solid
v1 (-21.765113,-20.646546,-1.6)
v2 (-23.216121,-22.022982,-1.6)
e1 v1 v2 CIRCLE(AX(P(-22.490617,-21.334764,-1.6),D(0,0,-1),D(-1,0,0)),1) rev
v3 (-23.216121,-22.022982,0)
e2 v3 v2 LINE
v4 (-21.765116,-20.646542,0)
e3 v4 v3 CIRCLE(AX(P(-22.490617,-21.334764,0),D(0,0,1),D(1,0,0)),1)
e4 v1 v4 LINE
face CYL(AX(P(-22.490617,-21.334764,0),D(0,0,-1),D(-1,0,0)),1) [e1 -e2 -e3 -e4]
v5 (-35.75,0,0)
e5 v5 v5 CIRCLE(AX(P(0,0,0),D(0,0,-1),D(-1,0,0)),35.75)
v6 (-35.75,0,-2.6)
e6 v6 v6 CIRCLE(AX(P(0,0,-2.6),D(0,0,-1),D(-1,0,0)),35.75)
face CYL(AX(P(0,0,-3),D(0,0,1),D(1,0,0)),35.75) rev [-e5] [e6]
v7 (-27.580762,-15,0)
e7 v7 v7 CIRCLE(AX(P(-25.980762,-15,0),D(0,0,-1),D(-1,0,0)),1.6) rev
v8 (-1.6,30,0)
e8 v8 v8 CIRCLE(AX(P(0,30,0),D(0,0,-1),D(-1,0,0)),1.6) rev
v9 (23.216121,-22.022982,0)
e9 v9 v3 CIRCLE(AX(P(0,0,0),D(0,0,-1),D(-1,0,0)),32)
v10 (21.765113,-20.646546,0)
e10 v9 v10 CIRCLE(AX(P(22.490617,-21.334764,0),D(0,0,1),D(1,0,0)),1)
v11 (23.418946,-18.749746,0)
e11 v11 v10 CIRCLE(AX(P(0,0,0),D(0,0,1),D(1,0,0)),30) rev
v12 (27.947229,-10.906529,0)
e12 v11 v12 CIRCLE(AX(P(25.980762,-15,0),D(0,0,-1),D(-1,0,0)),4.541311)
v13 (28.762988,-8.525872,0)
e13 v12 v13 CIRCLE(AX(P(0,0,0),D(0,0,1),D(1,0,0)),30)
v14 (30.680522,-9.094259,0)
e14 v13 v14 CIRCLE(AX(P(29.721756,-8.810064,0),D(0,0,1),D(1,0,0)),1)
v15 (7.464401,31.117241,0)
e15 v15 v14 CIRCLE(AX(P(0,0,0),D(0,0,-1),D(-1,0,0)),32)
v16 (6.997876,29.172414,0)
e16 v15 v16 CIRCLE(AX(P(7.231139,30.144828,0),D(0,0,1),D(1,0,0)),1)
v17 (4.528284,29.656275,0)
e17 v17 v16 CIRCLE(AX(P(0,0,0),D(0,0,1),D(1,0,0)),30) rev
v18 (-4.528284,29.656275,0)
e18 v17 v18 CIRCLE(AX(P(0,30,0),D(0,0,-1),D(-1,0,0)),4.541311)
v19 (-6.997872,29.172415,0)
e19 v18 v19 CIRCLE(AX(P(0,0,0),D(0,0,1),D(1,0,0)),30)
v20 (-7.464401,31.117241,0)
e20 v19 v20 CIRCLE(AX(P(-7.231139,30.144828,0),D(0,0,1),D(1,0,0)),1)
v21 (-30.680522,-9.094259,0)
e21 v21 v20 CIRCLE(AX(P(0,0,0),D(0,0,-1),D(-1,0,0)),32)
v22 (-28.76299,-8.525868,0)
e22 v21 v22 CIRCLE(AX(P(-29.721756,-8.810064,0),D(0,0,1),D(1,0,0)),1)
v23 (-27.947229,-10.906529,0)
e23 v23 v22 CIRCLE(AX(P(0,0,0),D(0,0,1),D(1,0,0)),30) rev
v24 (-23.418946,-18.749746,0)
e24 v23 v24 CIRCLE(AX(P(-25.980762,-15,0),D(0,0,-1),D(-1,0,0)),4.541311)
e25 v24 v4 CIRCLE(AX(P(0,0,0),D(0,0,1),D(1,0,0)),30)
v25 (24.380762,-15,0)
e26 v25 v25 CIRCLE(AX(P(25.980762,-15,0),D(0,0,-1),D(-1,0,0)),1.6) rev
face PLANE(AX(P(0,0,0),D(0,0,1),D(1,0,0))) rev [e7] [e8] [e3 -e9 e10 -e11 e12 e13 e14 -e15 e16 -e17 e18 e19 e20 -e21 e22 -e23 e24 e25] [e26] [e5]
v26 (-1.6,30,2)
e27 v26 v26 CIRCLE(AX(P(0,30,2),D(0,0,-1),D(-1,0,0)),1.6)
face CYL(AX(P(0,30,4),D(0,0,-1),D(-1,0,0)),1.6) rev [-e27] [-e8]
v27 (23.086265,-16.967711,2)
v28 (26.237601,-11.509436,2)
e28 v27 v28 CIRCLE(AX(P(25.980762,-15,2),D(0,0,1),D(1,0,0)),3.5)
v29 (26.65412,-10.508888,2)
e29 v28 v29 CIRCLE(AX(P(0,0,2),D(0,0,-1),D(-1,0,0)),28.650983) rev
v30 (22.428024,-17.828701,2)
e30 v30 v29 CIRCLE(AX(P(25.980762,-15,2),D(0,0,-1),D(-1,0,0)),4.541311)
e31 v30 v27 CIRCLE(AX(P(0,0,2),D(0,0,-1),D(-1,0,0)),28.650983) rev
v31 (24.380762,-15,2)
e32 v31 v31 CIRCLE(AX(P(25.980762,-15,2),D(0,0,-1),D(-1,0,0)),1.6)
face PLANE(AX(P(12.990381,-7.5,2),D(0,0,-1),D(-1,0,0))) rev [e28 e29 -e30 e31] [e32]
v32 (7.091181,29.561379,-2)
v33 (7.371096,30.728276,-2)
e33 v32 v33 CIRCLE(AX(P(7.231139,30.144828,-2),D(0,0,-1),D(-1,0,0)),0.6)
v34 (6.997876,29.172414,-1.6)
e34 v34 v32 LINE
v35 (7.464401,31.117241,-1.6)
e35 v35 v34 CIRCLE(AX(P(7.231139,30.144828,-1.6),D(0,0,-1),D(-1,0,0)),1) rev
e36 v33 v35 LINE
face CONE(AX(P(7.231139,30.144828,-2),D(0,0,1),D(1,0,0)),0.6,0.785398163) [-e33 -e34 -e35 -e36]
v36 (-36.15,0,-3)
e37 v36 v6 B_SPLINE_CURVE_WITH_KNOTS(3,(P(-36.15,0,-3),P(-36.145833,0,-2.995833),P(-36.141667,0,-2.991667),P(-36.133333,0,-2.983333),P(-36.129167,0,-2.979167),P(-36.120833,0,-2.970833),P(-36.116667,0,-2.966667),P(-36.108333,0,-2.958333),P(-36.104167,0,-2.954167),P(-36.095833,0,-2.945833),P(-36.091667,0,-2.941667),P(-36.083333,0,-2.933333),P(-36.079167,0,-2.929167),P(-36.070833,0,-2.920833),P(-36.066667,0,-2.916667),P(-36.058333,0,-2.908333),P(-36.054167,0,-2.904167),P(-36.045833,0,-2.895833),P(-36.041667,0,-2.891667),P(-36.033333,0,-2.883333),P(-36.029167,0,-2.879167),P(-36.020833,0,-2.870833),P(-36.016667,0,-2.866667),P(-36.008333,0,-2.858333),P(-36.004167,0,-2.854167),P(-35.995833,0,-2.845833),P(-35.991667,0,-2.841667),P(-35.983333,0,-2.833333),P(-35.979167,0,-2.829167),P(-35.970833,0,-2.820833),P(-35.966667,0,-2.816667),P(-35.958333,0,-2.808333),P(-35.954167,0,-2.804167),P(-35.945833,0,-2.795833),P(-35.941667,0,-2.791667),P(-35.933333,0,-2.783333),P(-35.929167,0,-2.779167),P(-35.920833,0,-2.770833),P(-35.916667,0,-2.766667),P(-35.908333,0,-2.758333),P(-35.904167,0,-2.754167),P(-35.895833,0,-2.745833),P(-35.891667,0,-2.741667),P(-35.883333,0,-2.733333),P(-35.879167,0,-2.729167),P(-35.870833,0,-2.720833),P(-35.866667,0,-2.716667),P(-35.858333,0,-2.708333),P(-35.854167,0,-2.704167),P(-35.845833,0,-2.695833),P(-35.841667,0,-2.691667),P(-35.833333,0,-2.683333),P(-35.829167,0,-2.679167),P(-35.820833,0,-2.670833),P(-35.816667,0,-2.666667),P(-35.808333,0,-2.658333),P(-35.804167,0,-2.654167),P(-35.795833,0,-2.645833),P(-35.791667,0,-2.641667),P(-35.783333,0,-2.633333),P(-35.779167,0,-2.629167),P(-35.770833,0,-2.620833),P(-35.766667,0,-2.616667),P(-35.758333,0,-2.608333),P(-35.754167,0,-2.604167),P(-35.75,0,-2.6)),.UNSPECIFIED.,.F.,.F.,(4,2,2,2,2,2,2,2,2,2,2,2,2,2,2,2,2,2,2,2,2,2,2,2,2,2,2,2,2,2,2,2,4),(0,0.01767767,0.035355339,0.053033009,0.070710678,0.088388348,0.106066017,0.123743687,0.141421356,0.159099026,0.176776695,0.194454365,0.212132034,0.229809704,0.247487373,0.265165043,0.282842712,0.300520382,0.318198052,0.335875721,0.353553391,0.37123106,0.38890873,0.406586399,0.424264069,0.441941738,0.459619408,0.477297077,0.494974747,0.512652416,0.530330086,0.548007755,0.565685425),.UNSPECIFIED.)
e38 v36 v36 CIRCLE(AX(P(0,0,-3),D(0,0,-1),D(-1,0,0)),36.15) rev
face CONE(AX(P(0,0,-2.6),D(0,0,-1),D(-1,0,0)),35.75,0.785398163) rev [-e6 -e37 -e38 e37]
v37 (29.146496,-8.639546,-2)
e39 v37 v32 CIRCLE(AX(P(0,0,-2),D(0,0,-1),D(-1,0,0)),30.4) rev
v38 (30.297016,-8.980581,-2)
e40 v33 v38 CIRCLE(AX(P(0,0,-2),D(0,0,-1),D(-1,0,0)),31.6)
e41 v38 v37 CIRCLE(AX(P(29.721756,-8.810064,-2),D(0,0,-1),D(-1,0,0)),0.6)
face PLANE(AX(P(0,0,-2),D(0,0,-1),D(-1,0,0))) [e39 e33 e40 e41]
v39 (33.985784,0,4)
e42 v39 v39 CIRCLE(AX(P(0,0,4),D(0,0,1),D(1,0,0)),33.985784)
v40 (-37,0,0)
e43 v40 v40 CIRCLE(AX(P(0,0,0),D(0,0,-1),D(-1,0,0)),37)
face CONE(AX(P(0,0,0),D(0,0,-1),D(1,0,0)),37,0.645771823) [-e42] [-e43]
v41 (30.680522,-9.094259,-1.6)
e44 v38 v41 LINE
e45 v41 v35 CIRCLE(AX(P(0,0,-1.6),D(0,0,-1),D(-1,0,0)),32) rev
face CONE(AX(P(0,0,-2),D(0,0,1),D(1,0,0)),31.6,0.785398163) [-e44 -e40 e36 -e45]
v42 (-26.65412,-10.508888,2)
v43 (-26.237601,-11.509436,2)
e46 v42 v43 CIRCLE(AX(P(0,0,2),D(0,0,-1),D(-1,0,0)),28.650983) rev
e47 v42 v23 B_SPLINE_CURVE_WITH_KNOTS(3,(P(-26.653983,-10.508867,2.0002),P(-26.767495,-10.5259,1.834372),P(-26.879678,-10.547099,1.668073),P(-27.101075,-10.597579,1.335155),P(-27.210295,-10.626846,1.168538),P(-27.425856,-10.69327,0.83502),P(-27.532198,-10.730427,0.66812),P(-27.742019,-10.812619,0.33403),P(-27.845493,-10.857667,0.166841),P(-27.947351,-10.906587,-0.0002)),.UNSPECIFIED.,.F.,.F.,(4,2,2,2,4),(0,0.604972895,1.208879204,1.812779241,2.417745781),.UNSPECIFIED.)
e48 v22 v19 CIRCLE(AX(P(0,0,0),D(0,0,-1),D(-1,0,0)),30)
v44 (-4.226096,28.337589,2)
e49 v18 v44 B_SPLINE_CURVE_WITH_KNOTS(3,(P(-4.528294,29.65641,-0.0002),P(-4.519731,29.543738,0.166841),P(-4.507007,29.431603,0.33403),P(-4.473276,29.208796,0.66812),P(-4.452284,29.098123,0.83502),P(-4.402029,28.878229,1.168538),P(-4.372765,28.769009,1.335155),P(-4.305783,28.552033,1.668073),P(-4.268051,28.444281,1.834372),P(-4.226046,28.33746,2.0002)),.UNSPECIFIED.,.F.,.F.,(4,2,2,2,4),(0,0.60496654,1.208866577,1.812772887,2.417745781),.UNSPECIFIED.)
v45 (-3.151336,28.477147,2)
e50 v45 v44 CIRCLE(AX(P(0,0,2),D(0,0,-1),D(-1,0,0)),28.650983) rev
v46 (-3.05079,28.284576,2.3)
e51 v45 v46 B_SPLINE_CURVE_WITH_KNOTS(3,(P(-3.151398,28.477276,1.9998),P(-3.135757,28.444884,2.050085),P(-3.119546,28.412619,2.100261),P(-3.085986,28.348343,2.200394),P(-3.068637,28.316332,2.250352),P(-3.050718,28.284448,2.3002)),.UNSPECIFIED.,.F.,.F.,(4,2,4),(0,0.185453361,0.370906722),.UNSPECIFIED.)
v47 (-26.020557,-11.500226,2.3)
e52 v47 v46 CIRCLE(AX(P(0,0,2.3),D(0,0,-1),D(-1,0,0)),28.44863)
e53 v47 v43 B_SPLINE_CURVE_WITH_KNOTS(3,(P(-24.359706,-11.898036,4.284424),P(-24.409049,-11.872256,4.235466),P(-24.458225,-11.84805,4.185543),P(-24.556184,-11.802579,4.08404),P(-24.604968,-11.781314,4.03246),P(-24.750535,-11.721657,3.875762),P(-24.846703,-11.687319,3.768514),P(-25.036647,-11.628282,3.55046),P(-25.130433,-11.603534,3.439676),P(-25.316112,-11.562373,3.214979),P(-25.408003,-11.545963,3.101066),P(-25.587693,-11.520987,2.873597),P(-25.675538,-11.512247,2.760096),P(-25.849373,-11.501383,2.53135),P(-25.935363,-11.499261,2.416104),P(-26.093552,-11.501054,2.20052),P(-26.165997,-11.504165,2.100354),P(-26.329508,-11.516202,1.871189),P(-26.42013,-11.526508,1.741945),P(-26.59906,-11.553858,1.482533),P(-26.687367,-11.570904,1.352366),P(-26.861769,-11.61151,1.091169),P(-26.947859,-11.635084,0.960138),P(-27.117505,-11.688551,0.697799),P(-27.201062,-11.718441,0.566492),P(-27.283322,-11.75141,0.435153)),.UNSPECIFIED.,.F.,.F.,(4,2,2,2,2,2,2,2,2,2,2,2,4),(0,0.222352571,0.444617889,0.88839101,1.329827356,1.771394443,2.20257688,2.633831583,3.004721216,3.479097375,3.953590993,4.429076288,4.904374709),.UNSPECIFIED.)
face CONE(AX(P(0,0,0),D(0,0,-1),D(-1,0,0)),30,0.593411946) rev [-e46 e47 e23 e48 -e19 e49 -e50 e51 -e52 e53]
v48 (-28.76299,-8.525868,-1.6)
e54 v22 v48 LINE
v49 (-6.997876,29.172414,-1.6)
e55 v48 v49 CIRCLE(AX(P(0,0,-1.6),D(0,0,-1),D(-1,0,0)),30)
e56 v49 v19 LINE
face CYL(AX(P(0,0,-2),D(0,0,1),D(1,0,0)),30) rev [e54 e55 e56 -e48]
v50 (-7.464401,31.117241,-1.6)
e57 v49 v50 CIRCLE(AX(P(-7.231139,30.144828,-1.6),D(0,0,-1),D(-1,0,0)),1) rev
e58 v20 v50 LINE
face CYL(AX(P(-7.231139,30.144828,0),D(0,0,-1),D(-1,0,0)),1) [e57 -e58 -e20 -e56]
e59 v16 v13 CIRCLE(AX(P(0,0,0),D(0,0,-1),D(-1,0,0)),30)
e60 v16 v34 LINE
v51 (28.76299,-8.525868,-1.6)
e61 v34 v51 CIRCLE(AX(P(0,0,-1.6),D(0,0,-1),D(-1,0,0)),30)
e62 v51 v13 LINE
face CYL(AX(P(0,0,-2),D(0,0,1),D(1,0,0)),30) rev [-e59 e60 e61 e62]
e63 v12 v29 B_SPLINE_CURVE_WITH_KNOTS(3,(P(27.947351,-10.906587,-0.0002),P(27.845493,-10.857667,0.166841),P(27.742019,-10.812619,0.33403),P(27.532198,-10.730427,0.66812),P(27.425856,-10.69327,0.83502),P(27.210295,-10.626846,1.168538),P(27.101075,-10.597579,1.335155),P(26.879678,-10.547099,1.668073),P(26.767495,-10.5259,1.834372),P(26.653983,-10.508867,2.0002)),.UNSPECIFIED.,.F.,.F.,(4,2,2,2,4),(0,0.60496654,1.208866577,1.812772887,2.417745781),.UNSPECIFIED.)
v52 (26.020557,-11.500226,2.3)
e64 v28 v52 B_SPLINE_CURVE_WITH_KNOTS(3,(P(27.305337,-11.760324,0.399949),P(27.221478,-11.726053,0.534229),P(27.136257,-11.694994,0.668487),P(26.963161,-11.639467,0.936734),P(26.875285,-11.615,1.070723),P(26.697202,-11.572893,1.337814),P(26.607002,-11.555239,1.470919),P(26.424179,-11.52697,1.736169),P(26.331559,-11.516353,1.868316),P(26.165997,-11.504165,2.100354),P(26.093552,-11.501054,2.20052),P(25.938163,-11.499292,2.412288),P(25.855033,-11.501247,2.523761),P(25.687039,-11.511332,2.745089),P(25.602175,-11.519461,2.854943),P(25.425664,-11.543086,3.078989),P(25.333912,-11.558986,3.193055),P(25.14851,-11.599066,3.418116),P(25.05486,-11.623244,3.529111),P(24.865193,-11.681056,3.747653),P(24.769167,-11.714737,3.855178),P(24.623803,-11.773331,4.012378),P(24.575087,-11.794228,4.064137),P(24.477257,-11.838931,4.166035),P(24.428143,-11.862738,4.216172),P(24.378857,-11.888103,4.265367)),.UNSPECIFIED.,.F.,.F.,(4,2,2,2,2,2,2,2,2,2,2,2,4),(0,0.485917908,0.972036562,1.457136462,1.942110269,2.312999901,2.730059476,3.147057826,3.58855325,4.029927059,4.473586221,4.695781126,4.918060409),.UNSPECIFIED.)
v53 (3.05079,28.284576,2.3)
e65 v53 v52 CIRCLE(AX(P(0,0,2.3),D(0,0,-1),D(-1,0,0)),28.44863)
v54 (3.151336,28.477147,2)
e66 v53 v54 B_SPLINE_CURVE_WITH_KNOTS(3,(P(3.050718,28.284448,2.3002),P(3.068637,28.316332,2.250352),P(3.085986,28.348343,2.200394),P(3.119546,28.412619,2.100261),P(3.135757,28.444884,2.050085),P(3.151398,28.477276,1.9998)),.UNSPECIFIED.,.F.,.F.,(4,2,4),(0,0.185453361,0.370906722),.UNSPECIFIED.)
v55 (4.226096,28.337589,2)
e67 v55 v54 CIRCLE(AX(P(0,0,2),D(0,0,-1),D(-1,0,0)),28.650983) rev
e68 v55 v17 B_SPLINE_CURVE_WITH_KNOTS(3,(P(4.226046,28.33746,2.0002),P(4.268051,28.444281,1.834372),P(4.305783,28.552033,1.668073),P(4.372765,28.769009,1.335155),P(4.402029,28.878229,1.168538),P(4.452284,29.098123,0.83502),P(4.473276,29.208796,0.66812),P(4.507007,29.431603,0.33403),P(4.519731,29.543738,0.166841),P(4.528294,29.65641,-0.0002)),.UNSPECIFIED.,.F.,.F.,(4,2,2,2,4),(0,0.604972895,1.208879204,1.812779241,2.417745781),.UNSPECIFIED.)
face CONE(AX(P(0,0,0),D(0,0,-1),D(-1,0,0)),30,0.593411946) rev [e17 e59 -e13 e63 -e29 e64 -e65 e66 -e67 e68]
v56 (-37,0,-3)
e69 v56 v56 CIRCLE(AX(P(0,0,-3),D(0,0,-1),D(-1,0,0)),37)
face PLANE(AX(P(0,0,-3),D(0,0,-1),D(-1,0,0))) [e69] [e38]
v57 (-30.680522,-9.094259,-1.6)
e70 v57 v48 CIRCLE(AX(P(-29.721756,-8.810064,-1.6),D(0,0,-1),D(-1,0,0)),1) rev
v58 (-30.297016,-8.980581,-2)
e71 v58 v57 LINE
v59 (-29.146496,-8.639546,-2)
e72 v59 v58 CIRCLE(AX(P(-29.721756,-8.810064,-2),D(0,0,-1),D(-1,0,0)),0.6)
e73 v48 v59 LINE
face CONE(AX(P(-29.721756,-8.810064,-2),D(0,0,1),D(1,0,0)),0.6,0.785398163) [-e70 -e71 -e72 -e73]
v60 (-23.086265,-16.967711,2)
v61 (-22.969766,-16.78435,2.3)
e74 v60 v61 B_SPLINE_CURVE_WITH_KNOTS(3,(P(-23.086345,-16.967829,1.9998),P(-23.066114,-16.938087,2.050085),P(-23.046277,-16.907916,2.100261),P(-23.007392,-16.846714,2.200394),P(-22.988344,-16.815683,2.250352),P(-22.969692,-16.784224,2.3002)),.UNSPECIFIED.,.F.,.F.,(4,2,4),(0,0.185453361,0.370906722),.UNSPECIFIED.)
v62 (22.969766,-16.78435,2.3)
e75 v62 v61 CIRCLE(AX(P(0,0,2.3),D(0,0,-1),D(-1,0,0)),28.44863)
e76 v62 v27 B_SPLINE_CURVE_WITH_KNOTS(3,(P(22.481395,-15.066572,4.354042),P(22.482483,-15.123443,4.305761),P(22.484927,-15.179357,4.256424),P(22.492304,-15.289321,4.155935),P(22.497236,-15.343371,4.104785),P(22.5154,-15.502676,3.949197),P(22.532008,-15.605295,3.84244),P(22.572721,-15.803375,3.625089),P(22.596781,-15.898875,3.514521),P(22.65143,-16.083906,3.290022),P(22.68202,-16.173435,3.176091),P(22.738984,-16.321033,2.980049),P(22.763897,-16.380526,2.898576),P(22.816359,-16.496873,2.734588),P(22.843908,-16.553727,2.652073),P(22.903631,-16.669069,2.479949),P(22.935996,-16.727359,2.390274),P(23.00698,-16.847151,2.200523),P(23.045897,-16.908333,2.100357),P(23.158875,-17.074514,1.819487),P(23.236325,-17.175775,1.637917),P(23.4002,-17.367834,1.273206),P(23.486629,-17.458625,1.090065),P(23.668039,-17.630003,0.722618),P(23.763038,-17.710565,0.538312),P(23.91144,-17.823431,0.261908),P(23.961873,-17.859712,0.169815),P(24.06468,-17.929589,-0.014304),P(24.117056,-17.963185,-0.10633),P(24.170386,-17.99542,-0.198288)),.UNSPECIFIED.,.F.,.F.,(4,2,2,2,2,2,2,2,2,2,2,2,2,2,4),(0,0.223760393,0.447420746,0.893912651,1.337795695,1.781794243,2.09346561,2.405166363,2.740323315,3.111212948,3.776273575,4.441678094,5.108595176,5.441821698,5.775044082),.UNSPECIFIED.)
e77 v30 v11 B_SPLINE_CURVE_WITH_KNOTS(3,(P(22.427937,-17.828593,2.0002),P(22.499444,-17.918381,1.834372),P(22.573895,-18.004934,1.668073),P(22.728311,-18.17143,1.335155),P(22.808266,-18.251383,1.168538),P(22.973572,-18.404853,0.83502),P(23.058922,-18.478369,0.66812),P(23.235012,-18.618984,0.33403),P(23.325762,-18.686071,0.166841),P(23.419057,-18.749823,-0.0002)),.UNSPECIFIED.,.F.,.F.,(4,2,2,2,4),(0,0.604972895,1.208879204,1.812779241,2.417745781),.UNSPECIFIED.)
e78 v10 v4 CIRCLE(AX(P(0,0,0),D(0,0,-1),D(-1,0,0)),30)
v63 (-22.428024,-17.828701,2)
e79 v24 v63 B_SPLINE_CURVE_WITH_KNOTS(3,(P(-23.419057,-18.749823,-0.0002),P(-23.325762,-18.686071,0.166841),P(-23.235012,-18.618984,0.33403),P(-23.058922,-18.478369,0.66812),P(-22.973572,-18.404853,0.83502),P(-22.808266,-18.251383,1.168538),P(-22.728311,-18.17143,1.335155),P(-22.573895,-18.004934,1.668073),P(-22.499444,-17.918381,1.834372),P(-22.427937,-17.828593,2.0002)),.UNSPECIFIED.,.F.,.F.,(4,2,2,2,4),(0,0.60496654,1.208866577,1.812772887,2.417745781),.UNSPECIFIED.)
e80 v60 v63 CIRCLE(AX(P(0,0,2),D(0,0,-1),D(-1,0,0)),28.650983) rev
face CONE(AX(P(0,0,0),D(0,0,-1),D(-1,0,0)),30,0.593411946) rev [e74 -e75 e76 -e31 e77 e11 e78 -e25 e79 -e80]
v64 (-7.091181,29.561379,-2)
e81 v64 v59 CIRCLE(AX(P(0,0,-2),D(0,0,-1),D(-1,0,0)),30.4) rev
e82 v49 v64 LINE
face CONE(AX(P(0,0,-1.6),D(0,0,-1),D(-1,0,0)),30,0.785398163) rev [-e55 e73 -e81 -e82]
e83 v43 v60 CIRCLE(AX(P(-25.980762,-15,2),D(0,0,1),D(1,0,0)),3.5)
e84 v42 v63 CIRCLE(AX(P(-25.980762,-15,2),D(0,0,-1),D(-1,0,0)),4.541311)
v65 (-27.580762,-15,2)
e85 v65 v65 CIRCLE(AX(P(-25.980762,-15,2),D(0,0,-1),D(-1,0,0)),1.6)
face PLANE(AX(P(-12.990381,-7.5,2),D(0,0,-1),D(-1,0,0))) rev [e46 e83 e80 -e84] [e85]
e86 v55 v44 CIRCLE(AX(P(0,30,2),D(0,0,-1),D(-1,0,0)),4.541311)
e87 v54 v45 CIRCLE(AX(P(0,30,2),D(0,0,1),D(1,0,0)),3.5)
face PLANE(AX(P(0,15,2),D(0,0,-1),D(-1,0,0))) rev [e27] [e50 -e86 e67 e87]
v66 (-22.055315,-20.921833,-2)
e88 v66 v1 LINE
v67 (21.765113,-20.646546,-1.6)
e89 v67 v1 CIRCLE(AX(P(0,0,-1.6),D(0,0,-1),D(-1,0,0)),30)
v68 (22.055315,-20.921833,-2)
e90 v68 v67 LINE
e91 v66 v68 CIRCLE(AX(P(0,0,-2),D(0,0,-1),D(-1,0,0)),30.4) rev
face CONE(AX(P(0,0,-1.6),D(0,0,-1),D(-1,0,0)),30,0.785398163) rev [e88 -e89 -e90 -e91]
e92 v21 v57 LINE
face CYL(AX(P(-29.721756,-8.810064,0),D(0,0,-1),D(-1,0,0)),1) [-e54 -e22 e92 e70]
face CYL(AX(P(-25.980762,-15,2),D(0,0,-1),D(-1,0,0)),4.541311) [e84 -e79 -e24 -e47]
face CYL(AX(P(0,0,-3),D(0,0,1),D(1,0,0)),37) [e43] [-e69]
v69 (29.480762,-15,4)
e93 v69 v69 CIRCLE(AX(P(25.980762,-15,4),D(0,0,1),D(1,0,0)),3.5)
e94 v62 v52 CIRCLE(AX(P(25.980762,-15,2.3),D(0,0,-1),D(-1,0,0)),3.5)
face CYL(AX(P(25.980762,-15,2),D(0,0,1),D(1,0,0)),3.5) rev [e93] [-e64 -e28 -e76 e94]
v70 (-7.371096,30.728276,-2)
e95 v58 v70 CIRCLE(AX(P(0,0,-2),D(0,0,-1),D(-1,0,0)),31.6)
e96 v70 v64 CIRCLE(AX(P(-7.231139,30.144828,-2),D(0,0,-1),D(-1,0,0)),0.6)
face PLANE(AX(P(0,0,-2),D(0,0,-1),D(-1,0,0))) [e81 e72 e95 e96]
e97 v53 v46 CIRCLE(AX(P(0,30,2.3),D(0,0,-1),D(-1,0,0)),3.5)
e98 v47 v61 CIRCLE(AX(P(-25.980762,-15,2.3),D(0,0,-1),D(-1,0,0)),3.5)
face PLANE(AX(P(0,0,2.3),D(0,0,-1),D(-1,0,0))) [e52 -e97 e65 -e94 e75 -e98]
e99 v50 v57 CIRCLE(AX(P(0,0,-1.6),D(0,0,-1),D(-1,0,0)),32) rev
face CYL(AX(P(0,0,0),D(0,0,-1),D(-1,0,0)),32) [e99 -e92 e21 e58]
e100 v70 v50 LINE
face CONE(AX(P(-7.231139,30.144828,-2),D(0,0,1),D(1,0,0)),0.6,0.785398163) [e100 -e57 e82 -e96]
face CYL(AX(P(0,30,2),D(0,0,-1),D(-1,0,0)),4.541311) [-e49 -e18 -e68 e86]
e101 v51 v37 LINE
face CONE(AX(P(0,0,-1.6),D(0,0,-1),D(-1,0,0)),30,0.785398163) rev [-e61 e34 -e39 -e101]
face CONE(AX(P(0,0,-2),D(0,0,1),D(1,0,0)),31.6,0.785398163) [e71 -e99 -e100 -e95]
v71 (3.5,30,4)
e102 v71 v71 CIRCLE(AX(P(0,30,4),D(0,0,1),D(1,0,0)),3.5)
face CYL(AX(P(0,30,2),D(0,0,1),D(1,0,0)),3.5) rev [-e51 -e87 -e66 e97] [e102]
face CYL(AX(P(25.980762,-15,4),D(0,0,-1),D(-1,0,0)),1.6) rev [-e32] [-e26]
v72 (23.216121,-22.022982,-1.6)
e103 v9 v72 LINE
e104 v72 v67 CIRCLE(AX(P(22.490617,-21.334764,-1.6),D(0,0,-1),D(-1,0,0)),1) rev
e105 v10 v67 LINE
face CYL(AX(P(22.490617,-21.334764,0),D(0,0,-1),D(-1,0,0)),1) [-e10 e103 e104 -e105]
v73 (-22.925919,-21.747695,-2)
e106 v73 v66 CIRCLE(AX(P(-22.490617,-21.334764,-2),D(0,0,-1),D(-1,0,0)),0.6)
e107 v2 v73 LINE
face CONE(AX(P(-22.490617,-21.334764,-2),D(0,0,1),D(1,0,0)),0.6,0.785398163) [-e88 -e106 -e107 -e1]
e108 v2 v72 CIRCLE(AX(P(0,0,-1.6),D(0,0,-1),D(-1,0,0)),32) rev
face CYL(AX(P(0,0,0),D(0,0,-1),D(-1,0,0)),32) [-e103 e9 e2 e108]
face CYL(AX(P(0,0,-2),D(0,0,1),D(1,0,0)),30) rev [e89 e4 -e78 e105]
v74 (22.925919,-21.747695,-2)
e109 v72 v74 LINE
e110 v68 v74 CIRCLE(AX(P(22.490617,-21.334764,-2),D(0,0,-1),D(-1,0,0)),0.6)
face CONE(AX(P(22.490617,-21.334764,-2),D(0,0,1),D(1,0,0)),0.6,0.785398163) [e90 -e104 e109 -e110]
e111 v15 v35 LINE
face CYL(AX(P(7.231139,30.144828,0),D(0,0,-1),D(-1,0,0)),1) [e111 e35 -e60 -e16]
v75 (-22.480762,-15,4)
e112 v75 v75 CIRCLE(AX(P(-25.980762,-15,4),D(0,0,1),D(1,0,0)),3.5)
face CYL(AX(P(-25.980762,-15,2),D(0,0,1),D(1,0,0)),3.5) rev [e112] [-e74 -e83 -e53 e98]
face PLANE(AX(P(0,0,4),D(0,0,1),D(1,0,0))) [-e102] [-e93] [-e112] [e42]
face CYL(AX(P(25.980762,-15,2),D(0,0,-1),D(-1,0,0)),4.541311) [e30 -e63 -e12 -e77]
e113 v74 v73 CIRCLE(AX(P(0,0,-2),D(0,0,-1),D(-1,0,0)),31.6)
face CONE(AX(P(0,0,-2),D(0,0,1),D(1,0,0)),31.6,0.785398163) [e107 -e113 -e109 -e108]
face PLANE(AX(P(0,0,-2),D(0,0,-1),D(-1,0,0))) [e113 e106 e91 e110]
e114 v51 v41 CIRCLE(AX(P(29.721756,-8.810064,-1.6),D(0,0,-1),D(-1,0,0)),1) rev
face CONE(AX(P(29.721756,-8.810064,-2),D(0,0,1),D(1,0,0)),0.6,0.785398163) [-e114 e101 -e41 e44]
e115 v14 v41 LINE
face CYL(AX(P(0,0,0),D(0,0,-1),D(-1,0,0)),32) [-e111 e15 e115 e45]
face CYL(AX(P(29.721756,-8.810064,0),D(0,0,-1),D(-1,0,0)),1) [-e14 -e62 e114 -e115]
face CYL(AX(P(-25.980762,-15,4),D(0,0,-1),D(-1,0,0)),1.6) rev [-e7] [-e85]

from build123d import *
from build123d.topology import SkipClean

# Parameters (mm, degrees)
SKETCH_1_R          = 37
EXTRUDE_1_DEPTH     = 4
EXTRUDE_1_TAPER     = 37
SKETCH_2_R          = 35
SKETCH_2_R_2        = 30
EXTRUDE_2_DEPTH     = 2
CUT_EXTRUDE_START   = -2
SKETCH_3_R          = 35
SKETCH_3_R_2        = 32.9
CUT_EXTRUDE_1_DEPTH = 2
SKETCH_4_R          = 30
CUT_EXTRUDE_2_DEPTH = 2.3
CUT_EXTRUDE_2_DRAFT = -34
SKETCH_5_R          = 1.6
CUT_EXTRUDE_3_DEPTH = 53.668776329
SKETCH_6_R          = 48.298599652
CUT_EXTRUDE_4_DEPTH = 2
SKETCH_7_R          = 1.6
EXTRUDE_3_DEPTH     = 2
SKETCH_8_R          = 3.5
CUT_EXTRUDE_5_DEPTH = 2
SKETCH_9_R          = 37
SKETCH_9_R_2        = 35.75
EXTRUDE_4_DEPTH     = 3
FILLET_2_R          = 1
CHAMFER_1_SIZE      = 0.4
CHAMFER_2_SIZE      = 0.4


with BuildPart() as part:
    # Эскиз1 → Бобышка-Вытянуть1 (new body)
    with BuildSketch(Plane.XY):
        Circle(SKETCH_1_R)
    extrude(amount=EXTRUDE_1_DEPTH, taper=EXTRUDE_1_TAPER)

    # Эскиз2 → Бобышка-Вытянуть2 (add)
    with BuildSketch(Plane(origin=(0, 0, 0), x_dir=(-1, 0, 0), z_dir=(0, 0, -1))):
        with Locations(Location((0, 0, 0), (0, 0, 180))):
            Circle(SKETCH_2_R)
        Circle(SKETCH_2_R_2, mode=Mode.SUBTRACT)
    extrude(amount=EXTRUDE_2_DEPTH)

    # Эскиз3 → Вырез-Вытянуть1 (cut)
    with BuildSketch(Plane(origin=(0, 0, -2), x_dir=(-1, 0, 0), z_dir=(0, 0, -1)).offset(CUT_EXTRUDE_START)):
        Circle(SKETCH_3_R)
        Circle(SKETCH_3_R_2, mode=Mode.SUBTRACT)
    extrude(amount=CUT_EXTRUDE_1_DEPTH, mode=Mode.SUBTRACT)


with BuildPart() as cut_extrude_2_tool:
    # Эскиз4 → Вырез-Вытянуть2 (with draft: the straight prism first)
    with BuildSketch(Plane(origin=(0, 0, 0), x_dir=(-1, 0, 0), z_dir=(0, 0, -1))):
        Circle(SKETCH_4_R)
    extrude(amount=-CUT_EXTRUDE_2_DEPTH)
    # Вырез-Вытянуть2: the draft: its side faces are tilted about the plane it starts from
    cut_extrude_2_sides = [cut_extrude_2_tool.faces().sort_by_distance(p)[0] for p in [
        (30, 0, 1.15),
    ]]
    draft(cut_extrude_2_sides, Plane(origin=(0, 0, 0), x_dir=(-1, 0, 0), z_dir=(0, 0, -1)), CUT_EXTRUDE_2_DRAFT)


with BuildPart() as part_1:
    add(part.part)

    # Вырез-Вытянуть2: cut by cut_extrude_2_tool
    add(cut_extrude_2_tool.part, mode=Mode.SUBTRACT)

    # Эскиз5 → Вырез-Вытянуть3 (cut, through all)
    with BuildSketch(Plane(origin=(0, 0, -2), x_dir=(-1, 0, 0), z_dir=(0, 0, -1))):
        with Locations((0, 30)):
            Circle(SKETCH_5_R)
        with Locations((25.980762114, -15)):
            Circle(SKETCH_5_R)
        with Locations((-25.980762114, -15)):
            Circle(SKETCH_5_R)
    extrude(amount=-CUT_EXTRUDE_3_DEPTH, mode=Mode.SUBTRACT)

    # Эскиз6 → Вырез-Вытянуть4 (cut)
    with BuildSketch(Plane(origin=(0, 0, -2), x_dir=(-1, 0, 0), z_dir=(0, 0, -1))):
        Circle(SKETCH_6_R)
        with BuildLine():
            ThreePointArc((-3.865493606, 28.971428571), (0, 26), (3.865493606, 28.971428571))
            ThreePointArc((3.865493606, 28.971428571), (5.228256401, 30.776743276), (7.464401446, 31.117241379))
            ThreePointArc((7.464401446, 31.117241379), (27.712812921, 16), (30.680522253, -9.094259414))
            ThreePointArc((30.680522253, -9.094259414), (29.267569723, -10.860568777), (27.02273993, -11.138098625))
            ThreePointArc((27.02273993, -11.138098625), (22.516660498, -13), (23.157246324, -17.833329946))
            ThreePointArc((23.157246324, -17.833329946), (24.039313322, -19.916174499), (23.216120807, -22.022981966))
            ThreePointArc((23.216120807, -22.022981966), (0, -32), (-23.216120807, -22.022981966))
            ThreePointArc((-23.216120807, -22.022981966), (-24.039313322, -19.916174499), (-23.157246324, -17.833329946))
            ThreePointArc((-23.157246324, -17.833329946), (-22.516660498, -13), (-27.02273993, -11.138098625))
            ThreePointArc((-27.02273993, -11.138098625), (-29.267569723, -10.860568777), (-30.680522253, -9.094259414))
            ThreePointArc((-30.680522253, -9.094259414), (-27.712812921, 16), (-7.464401446, 31.117241379))
            ThreePointArc((-7.464401446, 31.117241379), (-5.228256401, 30.776743276), (-3.865493606, 28.971428571))
        make_face(mode=Mode.SUBTRACT)
    extrude(amount=-CUT_EXTRUDE_4_DEPTH, mode=Mode.SUBTRACT)

    # Эскиз7 → Бобышка-Вытянуть3 (add)
    # profile 1 of 3: a face of its own
    with SkipClean():  # the faces are left unmerged after this step: merging them gives an invalid solid
        with BuildSketch(Plane(origin=(0, 0, 0), x_dir=(-1, 0, 0), z_dir=(0, 0, -1))):
            with BuildLine():
                ThreePointArc((-4.06066449, 32.033348311), (0, 25.458689456), (4.06066449, 32.033348311))
                ThreePointArc((4.06066449, 32.033348311), (0, 32.289694953), (-4.06066449, 32.033348311))
            make_face()
            with Locations((0, 30)):
                Circle(SKETCH_7_R, mode=Mode.SUBTRACT)
        # profile 2 of 3: a face of its own
        with BuildSketch(Plane(origin=(0, 0, 0), x_dir=(-1, 0, 0), z_dir=(0, 0, -1))):
            with BuildLine():
                ThreePointArc((29.772025651, -12.500035551), (22.047871816, -12.729344728), (25.711361161, -19.53331276))
                ThreePointArc((25.711361161, -19.53331276), (27.963696109, -16.144847476), (29.772025651, -12.500035551))
            make_face()
            with Locations((25.980762114, -15)):
                Circle(SKETCH_7_R, mode=Mode.SUBTRACT)
        # profile 3 of 3: a face of its own
        with BuildSketch(Plane(origin=(0, 0, 0), x_dir=(-1, 0, 0), z_dir=(0, 0, -1))):
            with BuildLine():
                ThreePointArc((-25.711361161, -19.53331276), (-22.047871816, -12.729344728), (-29.772025651, -12.500035551))
                ThreePointArc((-29.772025651, -12.500035551), (-27.963696109, -16.144847476), (-25.711361161, -19.53331276))
            make_face()
            with Locations((-25.980762114, -15)):
                Circle(SKETCH_7_R, mode=Mode.SUBTRACT)
        extrude(amount=-EXTRUDE_3_DEPTH)

    # Эскиз8 → Вырез-Вытянуть5 (cut)
    with BuildSketch(Plane.XY.offset(4)):
        with Locations((-25.980762114, -15)):
            Circle(SKETCH_8_R)
        with Locations((0, 30)):
            Circle(SKETCH_8_R)
        with Locations((25.980762114, -15)):
            Circle(SKETCH_8_R)
    extrude(amount=-CUT_EXTRUDE_5_DEPTH, mode=Mode.SUBTRACT)

    # Эскиз9 → Бобышка-Вытянуть4 (add)
    with BuildSketch(Plane(origin=(0, 0, 0), x_dir=(-1, 0, 0), z_dir=(0, 0, -1))):
        Circle(SKETCH_9_R)
        Circle(SKETCH_9_R_2, mode=Mode.SUBTRACT)
    extrude(amount=EXTRUDE_4_DEPTH)

    # Скругление2
    # the kernel refuses this fillet: 1 mm, written as the material it takes off along each edge
    with BuildSketch(Plane(origin=(-23.642618952, -18.466904697, -10.9538875), x_dir=(0.6526413615221648, -0.7576669804277436, 0), z_dir=(0, 0, 1))) as fillet_2_piece_1:
        with BuildLine():
            CenterArc((2.924720443, -0.998849918), FILLET_2_R, 92.748170632, 179.999844662)
            ThreePointArc((2.972663972, -1.997699966), (1.155509957, -1.491127473), (0, 0))
            ThreePointArc((0, 0), (1.438387103, -0.034502465), (2.876774206, 0))
        make_face()
    extrude(amount=10.9538875, mode=Mode.SUBTRACT)
    with BuildSketch(Plane(origin=(-27.814118073, -11.241656276, -10.953887512), x_dir=(-0.32983817184500175, 0.9440374888710443, 0), z_dir=(0, 0, 1))) as fillet_2_piece_2:
        with BuildLine():
            CenterArc((2.924720446, 0.998849918), FILLET_2_R, 87.25198461, 179.999844755)
            ThreePointArc((2.972663977, 1.997699966), (1.155509959, 1.491127475), (0, 0))
            ThreePointArc((0, 0), (1.438387105, 0.034502465), (2.876774209, 0))
        make_face()
    extrude(amount=10.953887512, mode=Mode.SUBTRACT)
    with BuildSketch(Plane(origin=(-4.171499121, 29.708560973, -10.953887502), x_dir=(-0.9824795334297418, -0.18637050837425084, 0), z_dir=(0, 0, 1))) as fillet_2_piece_3:
        with BuildLine():
            CenterArc((2.92472044, -0.998849918), FILLET_2_R, 92.748170629, 179.999844576)
            ThreePointArc((2.972663967, -1.997699966), (1.155509955, -1.491127472), (0, 0))
            ThreePointArc((0, 0), (1.438387101, -0.034502465), (2.876774203, 0))
        make_face()
    extrude(amount=10.953887502, mode=Mode.SUBTRACT)
    with BuildSketch(Plane(origin=(4.171499121, 29.708560973, -10.9538875), x_dir=(0.9824795333699458, -0.18637050868947486, 0), z_dir=(0, 0, 1))) as fillet_2_piece_4:
        with BuildLine():
            CenterArc((2.924720459, 0.998849918), FILLET_2_R, 87.251984243, 179.99984511)
            ThreePointArc((2.972663996, 1.997699965), (1.155509967, 1.491127481), (0, 0))
            ThreePointArc((0, 0), (1.438387111, 0.034502465), (2.876774222, 0))
        make_face()
    extrude(amount=10.9538875, mode=Mode.SUBTRACT)
    with BuildSketch(Plane(origin=(23.642618952, -18.466904697, -10.953887543), x_dir=(-0.11908016645541439, -0.9928846428246088, 0), z_dir=(0, 0, 1))) as fillet_2_piece_5:
        with BuildLine():
            CenterArc((2.984629175, -0.802296421), FILLET_2_R, 53.349957385, 179.999844812)
            ThreePointArc((2.387701167, -1.604591226), (1.213095178, -0.773658824), (0, 0))
            ThreePointArc((0, 0), (1.790777505, 0.593110736), (3.58155501, 0))
        make_face()
    extrude(amount=10.953887543, mode=Mode.SUBTRACT)
    with BuildSketch(Plane(origin=(27.814118073, -11.241656276, -10.9538875), x_dir=(0.3298381718829614, 0.9440374888577816, 0), z_dir=(0, 0, 1))) as fillet_2_piece_6:
        with BuildLine():
            CenterArc((2.924720444, -0.998849918), FILLET_2_R, 92.748170633, 179.999844688)
            ThreePointArc((2.972663973, -1.997699966), (1.155509958, -1.491127474), (0, 0))
            ThreePointArc((0, 0), (1.438387104, -0.034502465), (2.876774207, 0))
        make_face()
    extrude(amount=10.9538875, mode=Mode.SUBTRACT)

    # Фаска1
    # the kernel refuses this chamfer: 0.4 mm, written as the material it takes off along each edge
    with BuildSketch(Plane(origin=(0, 0, -2), x_dir=(0.7255039037858694, -0.6882180509049903, 0), z_dir=(0.6882180509049903, 0.7255039037858694, 0))) as chamfer_1_piece_1:
        Polygon((30 + CHAMFER_1_SIZE, 0), (30, -CHAMFER_1_SIZE), (30, 0), align=None)
    chamfer_1_piece_1_solid = revolve(axis=Axis((0, 0, -2), (0, 0, -1)), revolution_arc=93.02156569, mode=Mode.PRIVATE)
    with BuildSketch(Plane(origin=(22.490621017, -21.334759578, -2), x_dir=(-0.725503903786187, 0.6882180509046556, 0), z_dir=(-0.6882180509046556, -0.725503903786187, 0))) as chamfer_1_piece_2:
        Polygon((1, -CHAMFER_1_SIZE), (1 - CHAMFER_1_SIZE, 0), (1, 0), align=None)
    chamfer_1_piece_2_solid = revolve(axis=Axis((22.490621017, -21.334759578, -2), (0, 0, -1)), revolution_arc=179.999844812, mode=Mode.PRIVATE)
    with BuildSketch(Plane(origin=(-22.490621021, -21.334759574, -2), x_dir=(-0.7255057697779075, -0.6882160838130462, 0), z_dir=(0.6882160838130462, -0.7255057697779075, 0))) as chamfer_1_piece_3:
        Polygon((1, -CHAMFER_1_SIZE), (1 - CHAMFER_1_SIZE, 0), (1, 0), align=None)
    chamfer_1_piece_3_solid = revolve(axis=Axis((-22.490621021, -21.334759574, -2), (0, 0, -1)), revolution_arc=179.999844662, mode=Mode.PRIVATE)
    with BuildSketch(Plane(origin=(0, 0, -2), x_dir=(-0.23326236325769723, 0.9724138367420705, 0), z_dir=(0.9724138367420705, 0.23326236325769723, 0))) as chamfer_1_piece_4:
        Polygon((30, CHAMFER_1_SIZE), (30 + CHAMFER_1_SIZE, 0), (30, 0), align=None)
    chamfer_1_piece_4_solid = revolve(axis=Axis((0, 0, -2), (0, 0, 1)), revolution_arc=93.0215657, mode=Mode.PRIVATE)
    with BuildSketch(Plane(origin=(-7.231133261, 30.144828939, -2), x_dir=(-0.23325972543558307, 0.9724144694983289, 0), z_dir=(-0.9724144694983289, -0.23325972543558307, 0))) as chamfer_1_piece_5:
        Polygon((1, -CHAMFER_1_SIZE), (1 - CHAMFER_1_SIZE, 0), (1, 0), align=None)
    chamfer_1_piece_5_solid = revolve(axis=Axis((-7.231133261, 30.144828939, -2), (0, 0, -1)), revolution_arc=179.999844576, mode=Mode.PRIVATE)
    with BuildSketch(Plane(origin=(-29.721754286, -8.810069361, -2), x_dir=(0.9587662673001119, 0.2841957858368249, 0), z_dir=(-0.2841957858368249, 0.9587662673001119, 0))) as chamfer_1_piece_6:
        Polygon((1, -CHAMFER_1_SIZE), (1 - CHAMFER_1_SIZE, 0), (1, 0), align=None)
    chamfer_1_piece_6_solid = revolve(axis=Axis((-29.721754286, -8.810069361, -2), (0, 0, -1)), revolution_arc=179.999844755, mode=Mode.PRIVATE)
    with BuildSketch(Plane(origin=(0, 0, -2), x_dir=(0.23326236388166996, 0.972413836592392, 0), z_dir=(-0.972413836592392, 0.23326236388166996, 0))) as chamfer_1_piece_7:
        Polygon((30, -CHAMFER_1_SIZE), (30 + CHAMFER_1_SIZE, 0), (30, 0), align=None)
    chamfer_1_piece_7_solid = revolve(axis=Axis((0, 0, -2), (0, 0, -1)), revolution_arc=93.021565668, mode=Mode.PRIVATE)
    with BuildSketch(Plane(origin=(29.721754286, -8.810069363, -2), x_dir=(0.9587654969044608, -0.2841983848397845, 0), z_dir=(0.2841983848397845, 0.9587654969044608, 0))) as chamfer_1_piece_8:
        Polygon((1 - CHAMFER_1_SIZE, 0), (1, -CHAMFER_1_SIZE), (1, 0), align=None)
    chamfer_1_piece_8_solid = revolve(axis=Axis((29.721754286, -8.810069363, -2), (0, 0, -1)), revolution_arc=179.999844688, mode=Mode.PRIVATE)
    with BuildSketch(Plane(origin=(7.23113328, 30.144828934, -2), x_dir=(-0.23326236388121982, -0.9724138365925001, 0), z_dir=(0.9724138365925001, -0.23326236388121982, 0))) as chamfer_1_piece_9:
        Polygon((1, -CHAMFER_1_SIZE), (1 - CHAMFER_1_SIZE, 0), (1, 0), align=None)
    chamfer_1_piece_9_solid = revolve(axis=Axis((7.23113328, 30.144828934, -2), (0, 0, -1)), revolution_arc=179.99984511, mode=Mode.PRIVATE)
    with BuildSketch(Plane(origin=(0, 0, -2), x_dir=(-0.7255037752298013, -0.6882181864258646, 0), z_dir=(-0.6882181864258646, 0.7255037752298013, 0))) as chamfer_1_piece_10:
        Polygon((32, CHAMFER_1_SIZE), (32 - CHAMFER_1_SIZE, 0), (32, 0), align=None)
    chamfer_1_piece_10_solid = revolve(axis=Axis((0, 0, -2), (0, 0, 1)), revolution_arc=93.021544275, mode=Mode.PRIVATE)
    with BuildSketch(Plane(origin=(0, 0, -2), x_dir=(0.958766320406154, -0.28419560667759153, 0), z_dir=(-0.28419560667759153, -0.958766320406154, 0))) as chamfer_1_piece_11:
        Polygon((32, CHAMFER_1_SIZE), (32 - CHAMFER_1_SIZE, 0), (32, 0), align=None)
    chamfer_1_piece_11_solid = revolve(axis=Axis((0, 0, -2), (0, 0, 1)), revolution_arc=93.021544275, mode=Mode.PRIVATE)
    with BuildSketch(Plane(origin=(0, 0, -2), x_dir=(-0.2332625451763519, 0.9724137931034559, 0), z_dir=(0.9724137931034559, 0.2332625451763519, 0))) as chamfer_1_piece_12:
        Polygon((32, CHAMFER_1_SIZE), (32 - CHAMFER_1_SIZE, 0), (32, 0), align=None)
    chamfer_1_piece_12_solid = revolve(axis=Axis((0, 0, -2), (0, 0, 1)), revolution_arc=93.021544275, mode=Mode.PRIVATE)
    with BuildSketch(Plane(origin=(-6.76461381, 28.2, -2), x_dir=(-0.23325972543563675, 0.972414469498316, 0), z_dir=(0.972414469498316, 0.23325972543563675, 0))) as chamfer_1_piece_13:
        Polygon((3, CHAMFER_1_SIZE), (3 - CHAMFER_1_SIZE, 0), (3, 0), align=None)
    chamfer_1_piece_13_solid = revolve(axis=Axis((-6.76461381, 28.2, -2), (0, 0, 1)), revolution_arc=0.000166142, mode=Mode.PRIVATE)
    with BuildSketch(Plane(origin=(-27.804223292, -8.241672594, -2), x_dir=(-0.9587663204061734, -0.2841956066775257, 0), z_dir=(-0.2841956066775257, 0.9587663204061734, 0))) as chamfer_1_piece_14:
        Polygon((3, CHAMFER_1_SIZE), (3 - CHAMFER_1_SIZE, 0), (3, 0), align=None)
    chamfer_1_piece_14_solid = revolve(axis=Axis((-27.804223292, -8.241672594, -2), (0, 0, 1)), revolution_arc=0.000165951, mode=Mode.PRIVATE)
    with BuildSketch(Plane(origin=(27.804223292, -8.241672594, -2), x_dir=(0.958765496904526, -0.28419838483956483, 0), z_dir=(-0.28419838483956483, -0.958765496904526, 0))) as chamfer_1_piece_15:
        Polygon((3, CHAMFER_1_SIZE), (3 - CHAMFER_1_SIZE, 0), (3, 0), align=None)
    chamfer_1_piece_15_solid = revolve(axis=Axis((27.804223292, -8.241672594, -2), (0, 0, 1)), revolution_arc=0.000166023, mode=Mode.PRIVATE)
    with BuildSketch(Plane(origin=(6.76461381, 28.2, -2), x_dir=(0.2332625451763703, 0.9724137931034513, 0), z_dir=(0.9724137931034513, -0.2332625451763703, 0))) as chamfer_1_piece_16:
        Polygon((3, CHAMFER_1_SIZE), (3 - CHAMFER_1_SIZE, 0), (3, 0), align=None)
    chamfer_1_piece_16_solid = revolve(axis=Axis((6.76461381, 28.2, -2), (0, 0, 1)), revolution_arc=0.000165573, mode=Mode.PRIVATE)
    with BuildSketch(Plane(origin=(-21.039609482, -19.958327406, -2), x_dir=(-0.725505769777874, -0.6882160838130815, 0), z_dir=(-0.6882160838130815, 0.725505769777874, 0))) as chamfer_1_piece_17:
        Polygon((3, CHAMFER_1_SIZE), (3 - CHAMFER_1_SIZE, 0), (3, 0), align=None)
    chamfer_1_piece_17_solid = revolve(axis=Axis((-21.039609482, -19.958327406, -2), (0, 0, 1)), revolution_arc=0.000166051, mode=Mode.PRIVATE)
    with BuildSketch(Plane(origin=(21.039609482, -19.958327406, -2), x_dir=(0.7255037752297527, -0.6882181864259158, 0), z_dir=(-0.6882181864259158, -0.7255037752297527, 0))) as chamfer_1_piece_18:
        Polygon((3, CHAMFER_1_SIZE), (3 - CHAMFER_1_SIZE, 0), (3, 0), align=None)
    chamfer_1_piece_18_solid = revolve(axis=Axis((21.039609482, -19.958327406, -2), (0, 0, 1)), revolution_arc=0.00016589, mode=Mode.PRIVATE)
    add([chamfer_1_piece_1_solid, chamfer_1_piece_2_solid, chamfer_1_piece_3_solid, chamfer_1_piece_4_solid, chamfer_1_piece_5_solid, chamfer_1_piece_6_solid, chamfer_1_piece_7_solid, chamfer_1_piece_8_solid, chamfer_1_piece_9_solid, chamfer_1_piece_10_solid, chamfer_1_piece_11_solid, chamfer_1_piece_12_solid, chamfer_1_piece_13_solid, chamfer_1_piece_14_solid, chamfer_1_piece_15_solid, chamfer_1_piece_16_solid, chamfer_1_piece_17_solid, chamfer_1_piece_18_solid], mode=Mode.SUBTRACT)

    # Фаска2
    chamfer_2_edges = [part_1.edges().sort_by_distance(p)[0] for p in [
        (35.75, 0, -3),
    ]]
    chamfer(chamfer_2_edges, length=CHAMFER_2_SIZE)


solid = part_1.part
